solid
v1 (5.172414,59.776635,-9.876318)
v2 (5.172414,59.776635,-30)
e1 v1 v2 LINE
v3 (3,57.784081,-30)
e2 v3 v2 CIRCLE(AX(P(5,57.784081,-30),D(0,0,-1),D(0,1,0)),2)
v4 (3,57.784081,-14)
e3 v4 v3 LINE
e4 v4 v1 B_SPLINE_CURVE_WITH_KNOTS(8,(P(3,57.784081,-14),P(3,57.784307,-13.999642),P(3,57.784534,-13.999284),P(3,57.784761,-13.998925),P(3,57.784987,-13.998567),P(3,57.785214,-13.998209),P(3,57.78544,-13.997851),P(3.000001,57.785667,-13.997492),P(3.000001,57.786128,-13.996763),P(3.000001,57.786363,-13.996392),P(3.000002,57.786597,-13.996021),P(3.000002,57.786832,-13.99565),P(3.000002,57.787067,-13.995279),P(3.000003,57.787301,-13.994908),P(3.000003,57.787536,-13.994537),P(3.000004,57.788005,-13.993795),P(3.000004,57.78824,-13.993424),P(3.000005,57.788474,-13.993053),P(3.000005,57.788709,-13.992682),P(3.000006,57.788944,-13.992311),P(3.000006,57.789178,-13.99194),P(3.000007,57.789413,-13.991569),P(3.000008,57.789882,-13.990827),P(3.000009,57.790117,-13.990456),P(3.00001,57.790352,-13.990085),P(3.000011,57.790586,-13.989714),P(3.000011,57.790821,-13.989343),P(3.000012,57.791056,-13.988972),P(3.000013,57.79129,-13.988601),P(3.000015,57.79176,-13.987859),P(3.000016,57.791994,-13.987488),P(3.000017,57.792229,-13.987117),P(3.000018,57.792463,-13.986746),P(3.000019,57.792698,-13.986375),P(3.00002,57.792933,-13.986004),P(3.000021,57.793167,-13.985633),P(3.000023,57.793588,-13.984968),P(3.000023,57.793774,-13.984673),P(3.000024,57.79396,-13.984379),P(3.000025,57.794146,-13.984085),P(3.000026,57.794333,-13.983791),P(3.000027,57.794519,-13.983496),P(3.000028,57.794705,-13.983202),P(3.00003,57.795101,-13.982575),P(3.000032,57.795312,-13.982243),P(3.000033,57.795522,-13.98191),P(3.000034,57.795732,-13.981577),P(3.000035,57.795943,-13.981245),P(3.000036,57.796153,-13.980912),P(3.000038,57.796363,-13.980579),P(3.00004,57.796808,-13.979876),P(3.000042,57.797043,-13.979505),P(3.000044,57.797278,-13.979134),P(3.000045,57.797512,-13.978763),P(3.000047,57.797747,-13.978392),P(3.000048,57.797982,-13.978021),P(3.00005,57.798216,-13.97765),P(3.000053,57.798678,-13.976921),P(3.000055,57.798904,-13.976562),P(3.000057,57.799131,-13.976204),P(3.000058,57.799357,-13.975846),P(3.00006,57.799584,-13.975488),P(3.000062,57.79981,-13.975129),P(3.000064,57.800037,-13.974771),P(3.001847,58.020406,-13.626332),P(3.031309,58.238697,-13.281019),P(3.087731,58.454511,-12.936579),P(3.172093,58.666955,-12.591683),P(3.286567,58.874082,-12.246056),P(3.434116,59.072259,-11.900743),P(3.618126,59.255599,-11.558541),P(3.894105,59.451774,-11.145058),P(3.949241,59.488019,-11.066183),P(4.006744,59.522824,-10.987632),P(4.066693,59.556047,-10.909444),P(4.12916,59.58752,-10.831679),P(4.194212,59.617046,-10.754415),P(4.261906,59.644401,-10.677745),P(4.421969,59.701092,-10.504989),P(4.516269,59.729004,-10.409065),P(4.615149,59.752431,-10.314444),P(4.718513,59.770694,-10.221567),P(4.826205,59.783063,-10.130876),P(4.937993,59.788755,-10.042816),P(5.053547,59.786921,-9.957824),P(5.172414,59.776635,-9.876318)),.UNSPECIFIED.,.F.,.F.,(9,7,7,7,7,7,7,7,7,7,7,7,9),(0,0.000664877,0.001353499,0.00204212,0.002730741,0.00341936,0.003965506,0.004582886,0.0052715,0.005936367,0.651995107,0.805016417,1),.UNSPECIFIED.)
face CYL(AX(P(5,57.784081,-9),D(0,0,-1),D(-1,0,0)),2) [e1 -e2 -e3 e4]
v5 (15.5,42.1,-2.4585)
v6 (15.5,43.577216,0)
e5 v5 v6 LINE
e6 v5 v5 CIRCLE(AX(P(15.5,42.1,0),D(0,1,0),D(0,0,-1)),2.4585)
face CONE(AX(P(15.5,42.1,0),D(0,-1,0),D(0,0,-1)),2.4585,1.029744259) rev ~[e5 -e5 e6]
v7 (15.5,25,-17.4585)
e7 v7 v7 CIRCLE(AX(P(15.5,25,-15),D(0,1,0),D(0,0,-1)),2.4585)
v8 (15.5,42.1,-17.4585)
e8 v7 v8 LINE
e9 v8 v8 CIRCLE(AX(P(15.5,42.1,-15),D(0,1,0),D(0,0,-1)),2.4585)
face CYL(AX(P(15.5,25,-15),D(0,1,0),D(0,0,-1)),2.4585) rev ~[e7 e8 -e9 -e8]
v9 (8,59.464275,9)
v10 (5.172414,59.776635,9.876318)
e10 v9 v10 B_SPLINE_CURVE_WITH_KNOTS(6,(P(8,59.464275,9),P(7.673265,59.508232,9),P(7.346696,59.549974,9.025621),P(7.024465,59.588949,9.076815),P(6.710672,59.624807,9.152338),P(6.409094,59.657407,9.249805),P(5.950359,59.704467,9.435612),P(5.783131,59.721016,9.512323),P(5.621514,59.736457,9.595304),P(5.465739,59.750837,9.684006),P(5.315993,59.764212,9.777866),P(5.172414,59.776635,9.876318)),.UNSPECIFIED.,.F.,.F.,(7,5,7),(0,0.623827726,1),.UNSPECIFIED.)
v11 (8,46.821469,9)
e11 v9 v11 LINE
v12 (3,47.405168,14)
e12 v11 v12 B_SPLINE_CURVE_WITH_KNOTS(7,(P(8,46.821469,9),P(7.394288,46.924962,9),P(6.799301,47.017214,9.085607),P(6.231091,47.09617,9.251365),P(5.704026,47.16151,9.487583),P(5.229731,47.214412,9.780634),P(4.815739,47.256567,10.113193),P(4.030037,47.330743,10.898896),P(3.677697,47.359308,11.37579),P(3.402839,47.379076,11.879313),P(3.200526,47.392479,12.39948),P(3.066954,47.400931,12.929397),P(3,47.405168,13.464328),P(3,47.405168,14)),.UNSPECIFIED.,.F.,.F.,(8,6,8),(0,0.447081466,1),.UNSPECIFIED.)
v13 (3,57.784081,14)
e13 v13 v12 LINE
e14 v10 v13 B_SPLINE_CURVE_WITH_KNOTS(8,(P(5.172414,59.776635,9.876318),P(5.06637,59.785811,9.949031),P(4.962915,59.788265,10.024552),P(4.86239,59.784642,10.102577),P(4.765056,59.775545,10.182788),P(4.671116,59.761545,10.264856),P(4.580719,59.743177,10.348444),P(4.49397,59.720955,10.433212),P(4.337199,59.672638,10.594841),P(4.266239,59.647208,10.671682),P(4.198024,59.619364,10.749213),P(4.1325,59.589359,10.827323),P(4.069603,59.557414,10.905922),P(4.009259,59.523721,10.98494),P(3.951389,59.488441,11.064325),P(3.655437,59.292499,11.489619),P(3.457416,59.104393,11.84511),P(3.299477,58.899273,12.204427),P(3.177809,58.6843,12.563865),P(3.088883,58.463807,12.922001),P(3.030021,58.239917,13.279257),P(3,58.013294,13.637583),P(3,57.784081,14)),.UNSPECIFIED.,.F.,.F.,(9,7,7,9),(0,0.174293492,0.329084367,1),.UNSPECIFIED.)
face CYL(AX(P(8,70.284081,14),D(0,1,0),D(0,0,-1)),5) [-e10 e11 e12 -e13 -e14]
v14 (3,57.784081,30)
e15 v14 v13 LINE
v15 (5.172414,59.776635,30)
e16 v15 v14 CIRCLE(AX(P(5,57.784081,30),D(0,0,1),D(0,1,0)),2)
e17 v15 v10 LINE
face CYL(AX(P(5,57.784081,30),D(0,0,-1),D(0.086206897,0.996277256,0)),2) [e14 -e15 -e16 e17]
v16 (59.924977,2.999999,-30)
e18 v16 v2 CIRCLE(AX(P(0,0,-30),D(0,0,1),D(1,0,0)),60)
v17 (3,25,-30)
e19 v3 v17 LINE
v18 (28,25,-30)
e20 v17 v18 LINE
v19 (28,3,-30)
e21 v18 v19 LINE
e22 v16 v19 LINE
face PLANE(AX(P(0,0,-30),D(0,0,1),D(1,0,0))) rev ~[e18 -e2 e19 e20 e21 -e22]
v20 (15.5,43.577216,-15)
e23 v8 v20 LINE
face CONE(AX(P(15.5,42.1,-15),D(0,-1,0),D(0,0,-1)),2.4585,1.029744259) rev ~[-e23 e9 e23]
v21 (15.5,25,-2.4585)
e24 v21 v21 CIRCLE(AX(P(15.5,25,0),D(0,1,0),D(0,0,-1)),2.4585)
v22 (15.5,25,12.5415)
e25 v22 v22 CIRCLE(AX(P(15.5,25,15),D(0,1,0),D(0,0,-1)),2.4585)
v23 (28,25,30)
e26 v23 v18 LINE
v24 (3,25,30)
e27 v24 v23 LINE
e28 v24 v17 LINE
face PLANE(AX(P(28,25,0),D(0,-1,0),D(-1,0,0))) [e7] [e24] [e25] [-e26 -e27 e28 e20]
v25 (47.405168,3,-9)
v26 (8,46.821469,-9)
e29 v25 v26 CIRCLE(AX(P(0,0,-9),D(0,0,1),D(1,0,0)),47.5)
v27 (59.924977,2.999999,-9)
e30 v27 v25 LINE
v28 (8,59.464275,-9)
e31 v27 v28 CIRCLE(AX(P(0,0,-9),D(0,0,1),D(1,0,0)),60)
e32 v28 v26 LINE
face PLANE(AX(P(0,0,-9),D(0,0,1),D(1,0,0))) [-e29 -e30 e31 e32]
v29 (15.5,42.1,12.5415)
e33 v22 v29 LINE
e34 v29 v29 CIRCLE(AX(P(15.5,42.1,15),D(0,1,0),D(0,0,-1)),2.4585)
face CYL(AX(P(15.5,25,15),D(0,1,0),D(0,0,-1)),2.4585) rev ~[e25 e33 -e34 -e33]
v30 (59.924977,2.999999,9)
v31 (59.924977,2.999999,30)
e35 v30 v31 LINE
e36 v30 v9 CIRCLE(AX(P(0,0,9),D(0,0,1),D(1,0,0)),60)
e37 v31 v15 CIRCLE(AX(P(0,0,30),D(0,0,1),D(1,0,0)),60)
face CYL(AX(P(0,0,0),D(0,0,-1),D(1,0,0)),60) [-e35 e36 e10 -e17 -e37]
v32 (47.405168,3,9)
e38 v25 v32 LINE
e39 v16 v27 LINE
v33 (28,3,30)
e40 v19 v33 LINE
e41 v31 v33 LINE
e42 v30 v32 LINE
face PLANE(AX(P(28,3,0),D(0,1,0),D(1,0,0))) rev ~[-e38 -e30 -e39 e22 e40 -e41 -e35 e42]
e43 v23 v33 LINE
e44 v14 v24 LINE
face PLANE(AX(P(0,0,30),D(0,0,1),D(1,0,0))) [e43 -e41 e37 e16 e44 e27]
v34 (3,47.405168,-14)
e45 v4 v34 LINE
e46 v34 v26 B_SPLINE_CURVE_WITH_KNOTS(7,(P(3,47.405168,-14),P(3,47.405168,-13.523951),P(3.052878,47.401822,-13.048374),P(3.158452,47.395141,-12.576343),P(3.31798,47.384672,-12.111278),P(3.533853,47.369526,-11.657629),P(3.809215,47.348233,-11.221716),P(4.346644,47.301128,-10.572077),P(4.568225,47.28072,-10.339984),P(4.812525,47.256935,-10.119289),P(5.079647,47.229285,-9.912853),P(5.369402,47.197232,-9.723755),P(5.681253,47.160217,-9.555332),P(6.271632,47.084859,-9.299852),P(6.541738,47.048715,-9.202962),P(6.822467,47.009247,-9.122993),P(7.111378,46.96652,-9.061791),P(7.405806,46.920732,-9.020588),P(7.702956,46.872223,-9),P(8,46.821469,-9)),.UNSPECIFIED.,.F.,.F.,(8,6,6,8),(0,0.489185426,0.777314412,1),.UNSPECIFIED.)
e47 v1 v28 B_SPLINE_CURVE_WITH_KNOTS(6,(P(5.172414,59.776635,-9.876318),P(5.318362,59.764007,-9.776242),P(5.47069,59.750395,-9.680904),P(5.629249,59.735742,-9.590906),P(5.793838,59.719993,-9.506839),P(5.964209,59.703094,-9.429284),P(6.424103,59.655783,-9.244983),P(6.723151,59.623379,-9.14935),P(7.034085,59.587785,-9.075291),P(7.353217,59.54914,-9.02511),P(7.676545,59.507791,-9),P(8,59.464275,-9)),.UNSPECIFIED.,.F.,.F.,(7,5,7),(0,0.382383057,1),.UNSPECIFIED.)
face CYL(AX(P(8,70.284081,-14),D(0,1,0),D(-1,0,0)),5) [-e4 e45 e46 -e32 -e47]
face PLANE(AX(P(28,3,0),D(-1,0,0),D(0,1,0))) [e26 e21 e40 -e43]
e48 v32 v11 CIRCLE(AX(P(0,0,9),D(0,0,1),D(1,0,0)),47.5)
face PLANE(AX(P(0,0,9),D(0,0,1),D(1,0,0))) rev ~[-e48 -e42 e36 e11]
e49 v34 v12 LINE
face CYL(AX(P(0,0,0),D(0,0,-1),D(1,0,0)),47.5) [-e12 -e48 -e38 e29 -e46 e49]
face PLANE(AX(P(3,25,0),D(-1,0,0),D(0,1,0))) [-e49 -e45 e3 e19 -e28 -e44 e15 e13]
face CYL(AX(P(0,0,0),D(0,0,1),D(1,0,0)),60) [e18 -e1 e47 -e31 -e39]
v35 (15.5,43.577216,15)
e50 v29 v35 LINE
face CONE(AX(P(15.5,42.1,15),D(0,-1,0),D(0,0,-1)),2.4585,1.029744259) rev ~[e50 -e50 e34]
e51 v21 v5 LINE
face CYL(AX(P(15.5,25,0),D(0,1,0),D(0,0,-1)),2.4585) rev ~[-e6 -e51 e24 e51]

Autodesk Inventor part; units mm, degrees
ref_plane "YZ Plane" through (0, 0, 0) normal (1, 0, 0) x (0, 1, 0)
ref_plane "XZ Plane" through (0, 0, 0) normal (0, 1, 0) x (-1, 0, 0)
sketch "Sketch15" plane through (0, 0, 0) normal (0, 0, 1) x (1, 0, 0)
  circle A0 centre (0, 0) radius 60
  dimension "d88" = 120
extrude "Extrusion7" add sketch "Sketch15" along normal mid plane 60
ref_plane "Work Plane1" through (0, 0, 0) normal (0, 0, 1) x (1, 0, 0)
sketch "Sketch16" plane through (0, 0, 0) normal (0, 0, 1) x (1, 0, 0)
  circle A0 centre (0, 0) radius 60 projected
  circle A1 centre (0, 0) radius 47.5
  dimension "d117" = 95
extrude "Extrusion8" cut sketch "Sketch16" along normal mid plane 18
sketch "Sketch17" plane through (0, 0, 0) normal (0, 0, 1) x (1, 0, 0)
  circle A0 centre (0, 0) radius 60 projected
  line L0 (3, 3) -> (59.925, 3)
  line L1 (3, 3) -> (3, 59.925)
  line L2 (28, 25) -> (0, 25)
  line L3 (0, 25) -> (0, 0)
  line L4 (0, 0) -> (28, 0)
  line L5 (28, 0) -> (28, 25)
  point P0 (28, 3)
  point P1 (3, 25)
  dimension "d118" = 3
  dimension "d119" = 3
  dimension "d120" = 22
  dimension "d121" = 25
extrude "Extrusion9" cut sketch "Sketch17" along normal through all both and the other way through all contours A0 L1 L2 L3 L4 L5 L0 | L5 L4 L3 L2 L1 L0 | L0 L1 L2 L5
sketch "Sketch19" plane through (3, 25, 30) normal (0, -1, 0) x (1, 0, 0)
  line L0 (0, -60) -> (0, 0) projected
  point P0 (-3, -30)
  point P1 (12.5, -15)
  point P2 (12.5, -45)
  point P3 (0, -30)
  point P4 (12.5, -30)
  point P5 (0, -30)
  dimension "d122" = 30
  dimension "d123" = 15
  dimension "d124" = 12.5
hole "Hole6" at (15.5, 25, 15) at (15.5, 25, -15) at (15.5, 25, 0) direction (0, 1, 0) diameter 4.917 depth 17.1 tip angle 118 thread size "M6x1" class "6H" standard "TS profile"
fillet "Fillet4" radius 2 2 edges at (3, 59.925, -19.5) (3, 59.925, 19.5)
fillet "Fillet5" radius 5 2 edges at (3, 52.5946, -9) (3, 52.5946, 9)
equation "\"d123\" = 0.5 * d122"
properties part number "TL20240701-10120CV-020" material "S45C"
